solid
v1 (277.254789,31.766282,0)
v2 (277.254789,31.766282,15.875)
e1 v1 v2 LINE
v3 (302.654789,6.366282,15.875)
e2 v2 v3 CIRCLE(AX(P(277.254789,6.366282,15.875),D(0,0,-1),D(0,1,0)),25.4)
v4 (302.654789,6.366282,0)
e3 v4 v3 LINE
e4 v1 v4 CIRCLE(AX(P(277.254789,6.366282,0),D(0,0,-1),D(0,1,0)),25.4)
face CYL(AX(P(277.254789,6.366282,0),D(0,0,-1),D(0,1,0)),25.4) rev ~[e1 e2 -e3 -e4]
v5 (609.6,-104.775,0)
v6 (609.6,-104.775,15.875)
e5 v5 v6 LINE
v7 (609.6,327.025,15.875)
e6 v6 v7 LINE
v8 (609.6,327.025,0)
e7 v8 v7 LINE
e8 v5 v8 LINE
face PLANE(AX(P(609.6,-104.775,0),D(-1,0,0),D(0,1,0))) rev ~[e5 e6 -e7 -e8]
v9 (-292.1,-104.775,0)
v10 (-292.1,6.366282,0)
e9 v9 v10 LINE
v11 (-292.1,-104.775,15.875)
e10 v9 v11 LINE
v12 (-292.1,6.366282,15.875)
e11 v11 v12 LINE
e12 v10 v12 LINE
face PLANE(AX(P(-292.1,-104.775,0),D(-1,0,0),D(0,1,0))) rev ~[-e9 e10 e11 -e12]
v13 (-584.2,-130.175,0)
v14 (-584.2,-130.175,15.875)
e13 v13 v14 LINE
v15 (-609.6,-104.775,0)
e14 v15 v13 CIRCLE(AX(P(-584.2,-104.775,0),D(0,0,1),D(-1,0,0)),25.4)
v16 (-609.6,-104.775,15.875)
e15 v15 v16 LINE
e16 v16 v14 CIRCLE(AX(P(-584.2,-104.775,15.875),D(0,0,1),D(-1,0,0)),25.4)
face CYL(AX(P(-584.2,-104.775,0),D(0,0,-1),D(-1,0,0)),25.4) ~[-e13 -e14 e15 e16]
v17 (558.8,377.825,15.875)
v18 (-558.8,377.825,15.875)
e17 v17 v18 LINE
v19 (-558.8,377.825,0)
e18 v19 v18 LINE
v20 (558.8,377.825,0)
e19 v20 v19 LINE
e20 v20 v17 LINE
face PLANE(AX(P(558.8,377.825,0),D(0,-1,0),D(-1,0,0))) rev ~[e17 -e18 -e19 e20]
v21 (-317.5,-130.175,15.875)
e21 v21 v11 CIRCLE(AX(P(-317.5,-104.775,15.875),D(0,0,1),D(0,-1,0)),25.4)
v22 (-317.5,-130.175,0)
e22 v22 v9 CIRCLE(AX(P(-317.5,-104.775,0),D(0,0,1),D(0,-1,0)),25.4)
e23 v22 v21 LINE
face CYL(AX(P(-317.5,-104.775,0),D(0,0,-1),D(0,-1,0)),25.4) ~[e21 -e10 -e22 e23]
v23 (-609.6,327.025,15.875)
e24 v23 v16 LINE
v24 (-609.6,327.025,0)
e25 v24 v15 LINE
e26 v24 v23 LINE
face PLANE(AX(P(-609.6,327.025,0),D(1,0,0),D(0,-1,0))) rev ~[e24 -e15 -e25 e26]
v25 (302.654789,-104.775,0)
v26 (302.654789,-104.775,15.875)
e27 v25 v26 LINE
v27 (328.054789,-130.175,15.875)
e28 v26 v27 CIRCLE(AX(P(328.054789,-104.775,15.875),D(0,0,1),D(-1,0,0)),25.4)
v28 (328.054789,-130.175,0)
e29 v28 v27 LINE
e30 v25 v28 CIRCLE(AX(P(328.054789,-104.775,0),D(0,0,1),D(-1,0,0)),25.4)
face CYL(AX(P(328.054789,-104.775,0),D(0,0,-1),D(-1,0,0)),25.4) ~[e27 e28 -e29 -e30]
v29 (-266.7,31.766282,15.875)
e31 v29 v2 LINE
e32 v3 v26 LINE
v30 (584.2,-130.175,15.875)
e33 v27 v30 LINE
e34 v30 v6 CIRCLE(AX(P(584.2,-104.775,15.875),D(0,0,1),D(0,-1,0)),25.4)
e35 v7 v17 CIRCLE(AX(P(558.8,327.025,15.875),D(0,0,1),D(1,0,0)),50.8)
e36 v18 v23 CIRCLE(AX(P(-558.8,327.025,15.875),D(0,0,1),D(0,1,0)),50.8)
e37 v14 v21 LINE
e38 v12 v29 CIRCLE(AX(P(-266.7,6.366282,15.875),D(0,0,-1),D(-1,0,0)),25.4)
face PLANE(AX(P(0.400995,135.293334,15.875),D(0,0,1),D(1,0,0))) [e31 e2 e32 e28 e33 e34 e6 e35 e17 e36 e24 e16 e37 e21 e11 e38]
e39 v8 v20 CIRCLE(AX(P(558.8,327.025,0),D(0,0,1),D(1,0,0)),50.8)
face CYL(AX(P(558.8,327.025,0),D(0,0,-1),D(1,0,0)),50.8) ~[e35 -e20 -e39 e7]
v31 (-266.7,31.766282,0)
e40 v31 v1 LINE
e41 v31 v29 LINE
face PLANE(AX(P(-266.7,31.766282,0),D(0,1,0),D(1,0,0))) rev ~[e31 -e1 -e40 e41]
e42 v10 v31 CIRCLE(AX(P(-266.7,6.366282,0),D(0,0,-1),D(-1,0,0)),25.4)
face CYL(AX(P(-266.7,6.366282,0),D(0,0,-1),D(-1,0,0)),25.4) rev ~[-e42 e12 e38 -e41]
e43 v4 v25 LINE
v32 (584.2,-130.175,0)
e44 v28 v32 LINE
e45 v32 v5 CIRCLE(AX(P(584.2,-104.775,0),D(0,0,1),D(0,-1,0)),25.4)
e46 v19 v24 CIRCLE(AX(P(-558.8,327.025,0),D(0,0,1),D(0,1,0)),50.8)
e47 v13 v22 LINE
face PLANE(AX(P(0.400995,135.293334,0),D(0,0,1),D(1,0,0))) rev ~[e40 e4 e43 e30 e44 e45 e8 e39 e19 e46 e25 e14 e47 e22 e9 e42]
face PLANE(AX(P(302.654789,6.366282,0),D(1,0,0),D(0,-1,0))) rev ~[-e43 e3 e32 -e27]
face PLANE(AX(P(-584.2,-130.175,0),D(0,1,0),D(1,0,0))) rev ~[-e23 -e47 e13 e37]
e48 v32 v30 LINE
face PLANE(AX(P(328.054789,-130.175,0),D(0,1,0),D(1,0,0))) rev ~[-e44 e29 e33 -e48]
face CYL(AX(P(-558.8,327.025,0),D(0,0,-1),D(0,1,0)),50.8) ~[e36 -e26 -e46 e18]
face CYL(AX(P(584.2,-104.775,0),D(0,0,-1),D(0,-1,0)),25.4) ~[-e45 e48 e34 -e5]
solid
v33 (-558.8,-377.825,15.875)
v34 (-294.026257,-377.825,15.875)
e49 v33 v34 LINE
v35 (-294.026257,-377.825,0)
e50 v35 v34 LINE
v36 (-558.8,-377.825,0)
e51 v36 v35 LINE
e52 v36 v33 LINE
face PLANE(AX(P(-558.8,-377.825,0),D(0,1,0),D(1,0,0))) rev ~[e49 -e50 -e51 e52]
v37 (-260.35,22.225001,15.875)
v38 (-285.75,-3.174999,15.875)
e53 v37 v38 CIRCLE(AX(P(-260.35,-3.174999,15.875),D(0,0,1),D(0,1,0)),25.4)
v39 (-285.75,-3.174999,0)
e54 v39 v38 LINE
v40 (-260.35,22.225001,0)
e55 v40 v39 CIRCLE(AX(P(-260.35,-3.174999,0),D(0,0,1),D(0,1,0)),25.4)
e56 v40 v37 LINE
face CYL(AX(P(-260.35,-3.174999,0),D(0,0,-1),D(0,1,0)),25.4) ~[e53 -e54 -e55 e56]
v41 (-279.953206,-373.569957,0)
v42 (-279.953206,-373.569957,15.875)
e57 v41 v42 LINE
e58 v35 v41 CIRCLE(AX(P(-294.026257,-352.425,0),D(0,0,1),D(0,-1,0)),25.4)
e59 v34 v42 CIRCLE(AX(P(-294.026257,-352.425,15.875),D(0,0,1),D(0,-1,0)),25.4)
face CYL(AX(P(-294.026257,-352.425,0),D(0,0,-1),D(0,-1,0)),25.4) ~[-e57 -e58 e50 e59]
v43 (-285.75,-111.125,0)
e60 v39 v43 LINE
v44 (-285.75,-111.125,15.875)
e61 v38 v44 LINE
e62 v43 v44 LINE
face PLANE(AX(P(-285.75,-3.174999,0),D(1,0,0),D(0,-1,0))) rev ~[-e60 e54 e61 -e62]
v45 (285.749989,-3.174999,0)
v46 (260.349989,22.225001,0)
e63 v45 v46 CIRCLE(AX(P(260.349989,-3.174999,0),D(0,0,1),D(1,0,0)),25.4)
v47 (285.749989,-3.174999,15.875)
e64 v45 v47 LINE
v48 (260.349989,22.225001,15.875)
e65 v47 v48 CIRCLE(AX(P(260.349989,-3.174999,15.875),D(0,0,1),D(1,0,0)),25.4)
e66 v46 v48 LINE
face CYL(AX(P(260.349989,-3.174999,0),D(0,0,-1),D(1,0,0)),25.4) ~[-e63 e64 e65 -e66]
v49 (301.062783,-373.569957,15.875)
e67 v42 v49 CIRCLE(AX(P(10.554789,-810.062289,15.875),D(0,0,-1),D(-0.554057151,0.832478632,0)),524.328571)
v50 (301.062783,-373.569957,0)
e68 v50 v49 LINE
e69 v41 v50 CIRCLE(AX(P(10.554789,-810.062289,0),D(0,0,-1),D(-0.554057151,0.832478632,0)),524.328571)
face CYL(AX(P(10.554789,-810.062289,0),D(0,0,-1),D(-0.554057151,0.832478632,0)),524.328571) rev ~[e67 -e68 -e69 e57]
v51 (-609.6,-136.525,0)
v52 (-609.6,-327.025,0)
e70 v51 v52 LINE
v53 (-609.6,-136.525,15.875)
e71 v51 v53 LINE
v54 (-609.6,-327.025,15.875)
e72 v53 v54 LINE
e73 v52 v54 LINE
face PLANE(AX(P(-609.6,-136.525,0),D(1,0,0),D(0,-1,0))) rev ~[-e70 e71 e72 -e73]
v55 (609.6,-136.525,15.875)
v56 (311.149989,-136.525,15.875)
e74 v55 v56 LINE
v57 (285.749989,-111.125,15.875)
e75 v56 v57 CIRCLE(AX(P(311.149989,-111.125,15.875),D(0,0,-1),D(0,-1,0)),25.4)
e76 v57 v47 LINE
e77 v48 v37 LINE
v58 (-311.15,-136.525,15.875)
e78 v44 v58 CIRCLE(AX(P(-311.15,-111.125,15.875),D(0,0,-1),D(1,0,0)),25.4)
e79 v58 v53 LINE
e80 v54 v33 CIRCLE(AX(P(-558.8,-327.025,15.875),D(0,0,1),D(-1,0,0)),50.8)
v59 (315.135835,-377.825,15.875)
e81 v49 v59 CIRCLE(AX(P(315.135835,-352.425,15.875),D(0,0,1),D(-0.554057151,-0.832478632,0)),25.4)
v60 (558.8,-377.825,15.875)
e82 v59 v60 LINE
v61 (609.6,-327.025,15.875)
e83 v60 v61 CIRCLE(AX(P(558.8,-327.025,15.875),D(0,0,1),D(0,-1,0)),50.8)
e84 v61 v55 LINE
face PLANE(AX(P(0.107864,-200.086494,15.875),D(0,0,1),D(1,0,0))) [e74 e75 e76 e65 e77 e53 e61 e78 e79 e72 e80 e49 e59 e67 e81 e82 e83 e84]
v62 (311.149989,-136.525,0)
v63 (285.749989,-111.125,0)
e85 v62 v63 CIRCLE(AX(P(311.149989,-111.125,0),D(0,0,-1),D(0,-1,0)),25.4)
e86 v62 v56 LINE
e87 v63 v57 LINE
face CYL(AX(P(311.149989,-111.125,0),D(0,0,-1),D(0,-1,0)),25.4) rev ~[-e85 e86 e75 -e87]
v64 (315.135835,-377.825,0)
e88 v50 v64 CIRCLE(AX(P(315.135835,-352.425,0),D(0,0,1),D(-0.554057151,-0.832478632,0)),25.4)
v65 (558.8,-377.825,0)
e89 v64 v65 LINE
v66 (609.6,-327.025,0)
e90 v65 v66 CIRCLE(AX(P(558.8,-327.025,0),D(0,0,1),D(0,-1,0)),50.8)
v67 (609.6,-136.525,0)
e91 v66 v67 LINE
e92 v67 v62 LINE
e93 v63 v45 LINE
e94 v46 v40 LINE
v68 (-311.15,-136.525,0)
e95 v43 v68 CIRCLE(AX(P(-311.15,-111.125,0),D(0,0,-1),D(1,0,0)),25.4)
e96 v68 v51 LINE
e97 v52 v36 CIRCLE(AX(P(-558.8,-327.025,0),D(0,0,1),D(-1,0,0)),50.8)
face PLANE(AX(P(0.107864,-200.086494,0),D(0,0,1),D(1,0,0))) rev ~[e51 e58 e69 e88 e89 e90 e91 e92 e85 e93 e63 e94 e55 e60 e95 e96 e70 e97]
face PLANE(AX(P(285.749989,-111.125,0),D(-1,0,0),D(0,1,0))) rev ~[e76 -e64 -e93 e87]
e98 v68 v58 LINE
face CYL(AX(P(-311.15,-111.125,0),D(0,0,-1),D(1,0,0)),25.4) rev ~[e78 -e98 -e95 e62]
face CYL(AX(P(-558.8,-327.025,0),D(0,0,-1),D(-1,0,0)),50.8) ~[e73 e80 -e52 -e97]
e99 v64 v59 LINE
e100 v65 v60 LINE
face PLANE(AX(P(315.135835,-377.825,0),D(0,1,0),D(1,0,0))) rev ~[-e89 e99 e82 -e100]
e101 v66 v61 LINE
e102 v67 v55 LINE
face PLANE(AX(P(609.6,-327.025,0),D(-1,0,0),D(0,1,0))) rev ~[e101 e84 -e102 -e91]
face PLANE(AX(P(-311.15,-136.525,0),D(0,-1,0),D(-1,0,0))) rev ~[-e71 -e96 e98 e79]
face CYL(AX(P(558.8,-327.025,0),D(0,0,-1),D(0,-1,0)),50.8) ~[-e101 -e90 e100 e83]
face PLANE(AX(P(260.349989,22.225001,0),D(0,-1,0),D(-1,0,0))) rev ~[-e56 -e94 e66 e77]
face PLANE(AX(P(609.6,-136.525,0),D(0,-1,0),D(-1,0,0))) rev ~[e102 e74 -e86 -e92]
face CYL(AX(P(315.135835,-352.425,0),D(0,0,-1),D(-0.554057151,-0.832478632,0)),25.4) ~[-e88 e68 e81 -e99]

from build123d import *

# Parameters (mm, degrees)
F1_DEPTH = 15.875
F2_DEPTH = 15.875


# Not quite as in the source:
# - a length typed as a fraction of an inch, garbled in the dataset ("3 / 203.2 mm" for 3/8 in), is restored


with BuildPart() as f1:
    # F0 (on Top) → F1 (new body)
    with BuildSketch(Plane.XY):
        with BuildLine():
            Line((-558.8, -377.825), (-294.0262573309, -377.825))
            ThreePointArc((-294.0262573309, -377.825), (-286.6751320609, -376.7379791935), (-279.9532056979, -373.569957265))
            ThreePointArc((-279.9532056979, -373.569957265), (10.5547887247, -285.7337179487), (301.0627831473, -373.569957265))
            ThreePointArc((301.0627831473, -373.569957265), (307.7847095103, -376.7379791935), (315.1358347803, -377.825))
            Line((315.1358347803, -377.825), (558.8, -377.825))
            ThreePointArc((558.8, -377.825), (594.7210244843, -362.9460244843), (609.6, -327.025))
            Line((609.6, -327.025), (609.6, -136.5972012281))
            Line((609.6, -136.5972012281), (609.6, -136.525))
            Line((609.6, -136.525), (311.1499893665, -136.525))
            ThreePointArc((311.1499893665, -136.525), (293.1894771244, -129.0855122421), (285.7499893665, -111.125))
            Line((285.7499893665, -111.125), (285.7499893665, -3.1749994576))
            ThreePointArc((285.7499893665, -3.1749994576), (278.3105016087, 14.7855127845), (260.3499893665, 22.2250005424))
            Line((260.3499893665, 22.2250005424), (-260.35, 22.2250005424))
            ThreePointArc((-260.35, 22.2250005424), (-278.3105122421, 14.7855127845), (-285.75, -3.1749994576))
            Line((-285.75, -3.1749994576), (-285.75, -111.125))
            ThreePointArc((-285.75, -111.125), (-293.1894877579, -129.0855122421), (-311.15, -136.525))
            Line((-311.15, -136.525), (-609.6, -136.525))
            Line((-609.6, -136.525), (-609.6, -327.025))
            ThreePointArc((-609.6, -327.025), (-594.7210244843, -362.9460244843), (-558.8, -377.825))
        make_face()
    extrude(amount=F1_DEPTH)


with BuildPart() as f2:
    # F0 (on Top) → F2 (new body)
    with BuildSketch(Plane.XY):
        with BuildLine():
            ThreePointArc((609.6, 327.025), (594.7210244843, 362.9460244843), (558.8, 377.825))
            Line((558.8, 377.825), (-558.8, 377.825))
            ThreePointArc((-558.8, 377.825), (-594.7210244843, 362.9460244843), (-609.6, 327.025))
            Line((-609.6, 327.025), (-609.6, -104.775))
            ThreePointArc((-609.6, -104.775), (-602.1605122421, -122.7355122421), (-584.2, -130.175))
            Line((-584.2, -130.175), (-317.5, -130.175))
            ThreePointArc((-317.5, -130.175), (-299.5394877579, -122.7355122421), (-292.1, -104.775))
            Line((-292.1, -104.775), (-292.1, 6.3662820513))
            ThreePointArc((-292.1, 6.3662820513), (-284.6605122421, 24.3267942934), (-266.7, 31.7662820513))
            Line((-266.7, 31.7662820513), (277.2547887247, 31.7662820513))
            ThreePointArc((277.2547887247, 31.7662820513), (295.2153009668, 24.3267942934), (302.6547887247, 6.3662820513))
            Line((302.6547887247, 6.3662820513), (302.6547887247, -104.775))
            ThreePointArc((302.6547887247, -104.775), (310.0942764826, -122.7355122421), (328.0547887247, -130.175))
            Line((328.0547887247, -130.175), (584.2, -130.175))
            ThreePointArc((584.2, -130.175), (602.1605122421, -122.7355122421), (609.6, -104.775))
            Line((609.6, -104.775), (609.6, 327.025))
        make_face()
    extrude(amount=F2_DEPTH)


solid = Compound([f1.part, f2.part])
